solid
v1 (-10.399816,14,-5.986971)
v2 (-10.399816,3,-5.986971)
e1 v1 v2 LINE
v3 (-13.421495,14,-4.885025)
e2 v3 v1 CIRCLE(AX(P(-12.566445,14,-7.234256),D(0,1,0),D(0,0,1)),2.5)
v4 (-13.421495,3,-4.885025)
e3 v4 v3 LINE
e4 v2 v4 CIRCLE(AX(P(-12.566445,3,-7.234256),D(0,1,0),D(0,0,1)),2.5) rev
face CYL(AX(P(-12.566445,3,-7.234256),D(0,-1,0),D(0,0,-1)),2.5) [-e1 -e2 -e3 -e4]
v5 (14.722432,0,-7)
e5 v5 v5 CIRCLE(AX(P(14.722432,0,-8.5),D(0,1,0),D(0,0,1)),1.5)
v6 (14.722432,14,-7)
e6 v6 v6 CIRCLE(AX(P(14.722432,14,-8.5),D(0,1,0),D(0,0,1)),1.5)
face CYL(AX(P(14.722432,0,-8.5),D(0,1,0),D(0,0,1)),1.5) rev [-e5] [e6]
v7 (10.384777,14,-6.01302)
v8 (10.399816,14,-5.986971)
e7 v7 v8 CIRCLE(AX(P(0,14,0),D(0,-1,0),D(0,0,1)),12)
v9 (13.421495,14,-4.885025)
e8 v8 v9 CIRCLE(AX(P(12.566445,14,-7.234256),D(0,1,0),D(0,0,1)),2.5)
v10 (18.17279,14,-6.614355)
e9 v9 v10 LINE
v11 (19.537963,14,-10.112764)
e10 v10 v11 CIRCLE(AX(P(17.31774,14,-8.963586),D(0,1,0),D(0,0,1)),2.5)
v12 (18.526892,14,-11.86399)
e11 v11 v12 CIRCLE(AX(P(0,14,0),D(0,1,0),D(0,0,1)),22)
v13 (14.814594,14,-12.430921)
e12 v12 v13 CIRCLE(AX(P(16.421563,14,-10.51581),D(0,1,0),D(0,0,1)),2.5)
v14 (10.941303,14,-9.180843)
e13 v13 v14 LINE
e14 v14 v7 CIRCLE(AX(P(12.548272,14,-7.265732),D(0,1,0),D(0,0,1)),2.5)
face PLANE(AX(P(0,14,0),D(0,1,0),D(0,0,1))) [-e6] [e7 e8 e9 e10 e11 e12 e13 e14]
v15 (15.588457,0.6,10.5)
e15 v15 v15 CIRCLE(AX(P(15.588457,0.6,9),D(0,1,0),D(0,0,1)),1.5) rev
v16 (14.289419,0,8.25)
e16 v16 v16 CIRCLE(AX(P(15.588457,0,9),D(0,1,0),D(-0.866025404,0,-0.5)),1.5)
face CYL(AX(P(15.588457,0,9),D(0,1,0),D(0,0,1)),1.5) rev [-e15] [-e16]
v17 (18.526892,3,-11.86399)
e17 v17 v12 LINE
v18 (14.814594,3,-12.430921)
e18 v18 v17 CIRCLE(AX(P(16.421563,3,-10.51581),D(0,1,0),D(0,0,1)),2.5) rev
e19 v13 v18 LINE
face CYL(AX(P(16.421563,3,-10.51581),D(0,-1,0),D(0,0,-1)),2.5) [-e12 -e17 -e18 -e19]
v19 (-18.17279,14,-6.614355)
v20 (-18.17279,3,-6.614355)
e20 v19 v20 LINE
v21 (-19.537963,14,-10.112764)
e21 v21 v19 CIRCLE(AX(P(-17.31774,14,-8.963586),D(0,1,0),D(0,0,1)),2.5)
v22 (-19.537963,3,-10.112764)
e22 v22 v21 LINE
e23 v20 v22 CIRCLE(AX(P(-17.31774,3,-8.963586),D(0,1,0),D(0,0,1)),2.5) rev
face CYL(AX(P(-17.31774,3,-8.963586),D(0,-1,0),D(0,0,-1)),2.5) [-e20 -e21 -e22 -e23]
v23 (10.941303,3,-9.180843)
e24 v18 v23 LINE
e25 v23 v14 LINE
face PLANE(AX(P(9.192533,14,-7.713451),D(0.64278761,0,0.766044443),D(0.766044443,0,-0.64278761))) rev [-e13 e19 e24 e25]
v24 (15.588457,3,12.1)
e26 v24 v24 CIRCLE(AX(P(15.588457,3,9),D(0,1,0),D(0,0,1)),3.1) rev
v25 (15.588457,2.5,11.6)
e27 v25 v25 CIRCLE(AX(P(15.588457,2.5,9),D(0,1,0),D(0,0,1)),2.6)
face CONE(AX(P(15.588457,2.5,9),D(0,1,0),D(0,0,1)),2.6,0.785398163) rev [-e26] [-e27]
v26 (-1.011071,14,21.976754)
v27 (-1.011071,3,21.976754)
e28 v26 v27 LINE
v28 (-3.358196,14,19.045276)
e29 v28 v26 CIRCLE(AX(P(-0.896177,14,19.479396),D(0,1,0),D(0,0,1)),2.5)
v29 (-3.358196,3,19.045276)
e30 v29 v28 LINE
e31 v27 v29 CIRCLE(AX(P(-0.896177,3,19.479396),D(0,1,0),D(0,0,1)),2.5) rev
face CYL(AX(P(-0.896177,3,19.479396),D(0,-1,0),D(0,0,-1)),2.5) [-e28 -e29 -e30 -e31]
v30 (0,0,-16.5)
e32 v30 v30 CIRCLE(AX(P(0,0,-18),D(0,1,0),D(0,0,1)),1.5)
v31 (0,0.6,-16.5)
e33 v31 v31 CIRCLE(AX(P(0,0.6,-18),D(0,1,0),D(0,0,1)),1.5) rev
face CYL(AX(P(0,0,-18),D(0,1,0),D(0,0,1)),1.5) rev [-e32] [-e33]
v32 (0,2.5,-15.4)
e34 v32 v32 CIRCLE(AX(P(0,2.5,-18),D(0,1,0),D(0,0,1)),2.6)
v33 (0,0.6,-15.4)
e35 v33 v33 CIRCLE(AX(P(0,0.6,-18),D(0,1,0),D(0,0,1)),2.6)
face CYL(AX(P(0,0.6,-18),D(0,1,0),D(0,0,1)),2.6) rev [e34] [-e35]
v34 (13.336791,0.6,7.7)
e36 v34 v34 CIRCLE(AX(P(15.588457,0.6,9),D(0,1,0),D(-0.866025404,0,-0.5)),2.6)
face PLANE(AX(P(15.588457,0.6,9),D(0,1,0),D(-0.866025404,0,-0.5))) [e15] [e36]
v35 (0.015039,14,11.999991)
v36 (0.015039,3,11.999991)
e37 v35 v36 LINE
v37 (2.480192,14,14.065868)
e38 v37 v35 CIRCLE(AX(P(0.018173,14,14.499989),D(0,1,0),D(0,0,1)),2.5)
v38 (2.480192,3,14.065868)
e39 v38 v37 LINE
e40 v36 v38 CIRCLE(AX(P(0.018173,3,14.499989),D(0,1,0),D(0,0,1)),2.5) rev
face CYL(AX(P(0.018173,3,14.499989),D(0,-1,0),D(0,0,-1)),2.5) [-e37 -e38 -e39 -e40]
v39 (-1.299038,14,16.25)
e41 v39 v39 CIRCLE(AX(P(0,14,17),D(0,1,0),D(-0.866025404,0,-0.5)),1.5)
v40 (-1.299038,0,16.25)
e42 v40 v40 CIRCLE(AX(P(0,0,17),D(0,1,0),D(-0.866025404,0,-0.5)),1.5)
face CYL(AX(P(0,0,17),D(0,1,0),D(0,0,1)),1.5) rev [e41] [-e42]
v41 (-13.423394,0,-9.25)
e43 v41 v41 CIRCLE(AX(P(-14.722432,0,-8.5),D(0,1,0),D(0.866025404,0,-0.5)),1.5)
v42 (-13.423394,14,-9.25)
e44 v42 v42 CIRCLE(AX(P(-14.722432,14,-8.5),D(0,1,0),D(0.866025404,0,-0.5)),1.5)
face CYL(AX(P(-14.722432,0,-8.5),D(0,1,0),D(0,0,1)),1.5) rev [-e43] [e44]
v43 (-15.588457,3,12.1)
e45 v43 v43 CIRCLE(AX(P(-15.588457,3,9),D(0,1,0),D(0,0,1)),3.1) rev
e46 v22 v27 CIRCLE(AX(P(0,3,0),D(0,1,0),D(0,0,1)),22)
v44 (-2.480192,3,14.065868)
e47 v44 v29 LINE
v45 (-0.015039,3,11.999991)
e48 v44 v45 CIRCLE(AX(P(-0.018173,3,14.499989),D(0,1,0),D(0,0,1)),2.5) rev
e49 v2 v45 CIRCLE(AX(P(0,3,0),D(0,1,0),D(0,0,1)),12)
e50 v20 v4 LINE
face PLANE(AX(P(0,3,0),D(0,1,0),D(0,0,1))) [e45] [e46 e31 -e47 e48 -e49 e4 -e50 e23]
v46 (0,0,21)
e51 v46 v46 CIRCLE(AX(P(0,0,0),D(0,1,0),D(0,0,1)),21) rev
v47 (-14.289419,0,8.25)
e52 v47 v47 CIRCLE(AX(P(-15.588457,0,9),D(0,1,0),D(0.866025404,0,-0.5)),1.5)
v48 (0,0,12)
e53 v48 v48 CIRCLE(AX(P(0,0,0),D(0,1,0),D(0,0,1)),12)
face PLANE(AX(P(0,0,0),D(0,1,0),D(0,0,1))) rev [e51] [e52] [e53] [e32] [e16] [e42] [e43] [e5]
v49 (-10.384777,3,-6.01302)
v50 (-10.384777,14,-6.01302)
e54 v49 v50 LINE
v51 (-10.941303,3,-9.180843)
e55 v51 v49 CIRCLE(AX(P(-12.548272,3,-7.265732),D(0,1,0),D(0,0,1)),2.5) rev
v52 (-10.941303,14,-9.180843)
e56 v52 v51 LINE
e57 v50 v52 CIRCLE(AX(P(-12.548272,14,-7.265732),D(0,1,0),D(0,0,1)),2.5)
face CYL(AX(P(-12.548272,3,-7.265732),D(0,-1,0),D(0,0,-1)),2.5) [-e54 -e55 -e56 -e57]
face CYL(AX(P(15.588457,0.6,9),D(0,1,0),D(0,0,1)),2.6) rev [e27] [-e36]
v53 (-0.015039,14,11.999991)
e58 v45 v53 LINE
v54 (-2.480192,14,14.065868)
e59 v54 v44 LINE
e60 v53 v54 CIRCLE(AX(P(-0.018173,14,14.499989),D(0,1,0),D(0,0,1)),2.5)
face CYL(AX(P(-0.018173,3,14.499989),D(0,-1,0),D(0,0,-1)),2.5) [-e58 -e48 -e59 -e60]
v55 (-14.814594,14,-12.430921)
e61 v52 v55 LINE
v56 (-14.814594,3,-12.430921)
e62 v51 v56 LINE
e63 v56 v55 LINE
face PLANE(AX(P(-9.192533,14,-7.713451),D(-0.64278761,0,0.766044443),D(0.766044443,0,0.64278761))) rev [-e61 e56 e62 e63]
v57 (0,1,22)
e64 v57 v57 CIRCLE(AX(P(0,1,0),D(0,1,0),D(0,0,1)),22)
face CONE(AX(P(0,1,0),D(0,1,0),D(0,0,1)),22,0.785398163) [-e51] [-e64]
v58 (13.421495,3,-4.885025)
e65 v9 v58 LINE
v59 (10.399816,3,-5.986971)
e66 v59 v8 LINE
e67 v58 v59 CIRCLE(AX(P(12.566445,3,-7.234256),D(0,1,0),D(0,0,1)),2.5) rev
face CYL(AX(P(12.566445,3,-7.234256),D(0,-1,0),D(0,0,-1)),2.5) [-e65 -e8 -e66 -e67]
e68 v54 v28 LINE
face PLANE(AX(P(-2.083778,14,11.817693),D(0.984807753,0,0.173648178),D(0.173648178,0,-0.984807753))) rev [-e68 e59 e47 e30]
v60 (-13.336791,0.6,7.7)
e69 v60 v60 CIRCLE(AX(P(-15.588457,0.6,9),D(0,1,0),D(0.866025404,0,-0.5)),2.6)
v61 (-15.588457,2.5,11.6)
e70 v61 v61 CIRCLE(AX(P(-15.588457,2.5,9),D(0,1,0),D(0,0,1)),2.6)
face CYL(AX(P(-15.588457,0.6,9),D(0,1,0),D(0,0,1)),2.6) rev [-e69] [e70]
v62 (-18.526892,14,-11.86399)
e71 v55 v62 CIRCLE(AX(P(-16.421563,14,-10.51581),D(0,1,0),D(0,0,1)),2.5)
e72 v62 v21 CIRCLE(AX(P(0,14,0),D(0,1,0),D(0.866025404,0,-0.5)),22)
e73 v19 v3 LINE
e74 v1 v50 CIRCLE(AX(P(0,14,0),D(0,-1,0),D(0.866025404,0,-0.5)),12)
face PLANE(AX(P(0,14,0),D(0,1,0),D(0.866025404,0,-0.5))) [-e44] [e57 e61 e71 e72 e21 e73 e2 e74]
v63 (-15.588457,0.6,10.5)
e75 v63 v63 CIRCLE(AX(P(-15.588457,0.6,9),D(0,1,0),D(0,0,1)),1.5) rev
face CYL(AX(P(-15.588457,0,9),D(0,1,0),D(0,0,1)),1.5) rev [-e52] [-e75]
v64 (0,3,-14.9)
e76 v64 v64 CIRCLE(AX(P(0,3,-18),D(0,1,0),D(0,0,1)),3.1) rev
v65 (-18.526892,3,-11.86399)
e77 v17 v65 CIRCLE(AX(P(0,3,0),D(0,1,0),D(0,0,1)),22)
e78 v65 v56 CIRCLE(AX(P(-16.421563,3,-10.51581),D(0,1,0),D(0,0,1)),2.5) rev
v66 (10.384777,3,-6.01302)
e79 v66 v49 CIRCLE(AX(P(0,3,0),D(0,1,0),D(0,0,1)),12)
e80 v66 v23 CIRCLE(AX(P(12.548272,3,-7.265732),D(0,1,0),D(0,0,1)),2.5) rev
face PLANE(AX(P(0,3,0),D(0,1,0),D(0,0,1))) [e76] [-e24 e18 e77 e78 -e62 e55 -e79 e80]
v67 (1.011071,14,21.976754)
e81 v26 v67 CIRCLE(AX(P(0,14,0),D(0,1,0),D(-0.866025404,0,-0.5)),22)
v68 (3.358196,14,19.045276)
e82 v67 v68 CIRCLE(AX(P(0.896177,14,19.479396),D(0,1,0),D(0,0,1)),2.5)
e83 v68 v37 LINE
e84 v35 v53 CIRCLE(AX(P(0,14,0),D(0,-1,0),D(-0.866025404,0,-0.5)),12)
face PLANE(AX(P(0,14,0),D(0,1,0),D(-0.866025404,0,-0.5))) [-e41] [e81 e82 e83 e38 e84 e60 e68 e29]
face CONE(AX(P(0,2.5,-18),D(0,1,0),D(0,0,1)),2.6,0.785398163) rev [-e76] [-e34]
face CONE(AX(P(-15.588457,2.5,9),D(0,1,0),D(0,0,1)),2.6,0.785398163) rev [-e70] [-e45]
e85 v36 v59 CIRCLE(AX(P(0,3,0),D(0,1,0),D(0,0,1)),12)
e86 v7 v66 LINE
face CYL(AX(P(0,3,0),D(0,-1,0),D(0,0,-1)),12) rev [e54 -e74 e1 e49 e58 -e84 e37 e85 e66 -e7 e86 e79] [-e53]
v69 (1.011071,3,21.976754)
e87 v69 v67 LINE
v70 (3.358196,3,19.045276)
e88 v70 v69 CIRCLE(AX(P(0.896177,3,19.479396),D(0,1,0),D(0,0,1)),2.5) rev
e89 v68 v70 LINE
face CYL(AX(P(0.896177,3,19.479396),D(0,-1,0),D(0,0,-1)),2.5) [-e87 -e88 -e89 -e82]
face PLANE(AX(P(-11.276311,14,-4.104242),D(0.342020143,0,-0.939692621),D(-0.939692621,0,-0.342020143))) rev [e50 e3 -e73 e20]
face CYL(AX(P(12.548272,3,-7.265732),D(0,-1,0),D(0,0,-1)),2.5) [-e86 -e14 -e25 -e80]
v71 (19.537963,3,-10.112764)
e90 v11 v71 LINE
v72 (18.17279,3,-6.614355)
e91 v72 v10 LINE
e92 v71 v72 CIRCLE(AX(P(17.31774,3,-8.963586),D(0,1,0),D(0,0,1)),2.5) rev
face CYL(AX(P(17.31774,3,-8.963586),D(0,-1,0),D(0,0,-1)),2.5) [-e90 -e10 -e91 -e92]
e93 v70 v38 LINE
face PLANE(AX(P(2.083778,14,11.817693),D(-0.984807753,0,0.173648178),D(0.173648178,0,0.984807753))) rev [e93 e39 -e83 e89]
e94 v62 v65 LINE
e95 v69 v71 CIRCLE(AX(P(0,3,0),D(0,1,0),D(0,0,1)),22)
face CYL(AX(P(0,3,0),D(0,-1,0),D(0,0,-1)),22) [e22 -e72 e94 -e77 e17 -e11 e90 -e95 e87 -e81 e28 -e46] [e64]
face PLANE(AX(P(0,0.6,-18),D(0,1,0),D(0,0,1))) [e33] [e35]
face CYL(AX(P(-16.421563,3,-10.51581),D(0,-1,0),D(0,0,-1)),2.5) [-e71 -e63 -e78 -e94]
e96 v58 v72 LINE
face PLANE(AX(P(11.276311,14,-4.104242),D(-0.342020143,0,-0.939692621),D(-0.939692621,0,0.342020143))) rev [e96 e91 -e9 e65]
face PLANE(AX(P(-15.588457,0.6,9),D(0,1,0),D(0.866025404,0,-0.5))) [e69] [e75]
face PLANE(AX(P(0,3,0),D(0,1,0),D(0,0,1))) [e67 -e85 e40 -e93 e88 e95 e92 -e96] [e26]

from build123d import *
from build123d.topology import SkipClean

# Parameters (mm, degrees)
SKETCH1_R           = 22
SKETCH1_R_2         = 12
BOSS_EXTRUDE1_DEPTH = 3
SKETCH3_R           = 1.5
CUT_EXTRUDE2_DEPTH  = 32.256999216
SKETCH5_R           = 2.6
CUT_EXTRUDE3_DEPTH  = 2.4
CIRPATTERN1_COUNT   = 3
SKETCH4_R           = 1.5
BOSS_EXTRUDE2_DEPTH = 11
CIRPATTERN2_COUNT   = 3
FILLET1_R           = 2.5
CHAMFER1_SIZE       = 0.5
CHAMFER2_SIZE       = 1


with BuildPart() as part:
    # Sketch1 → Boss-Extrude1 (new body)
    with BuildSketch(Plane(origin=(0, 0, 0), x_dir=(1, 0, 0), z_dir=(0, 1, 0))):
        with Locations(Location((0, 0, 0), (0, 0, 270))):
            Circle(SKETCH1_R)
        with Locations(Location((0, 0, 0), (0, 0, 270))):
            Circle(SKETCH1_R_2, mode=Mode.SUBTRACT)
    extrude(amount=BOSS_EXTRUDE1_DEPTH)

    # Sketch3 → Cut-Extrude2 (cut, through all)
    with BuildSketch(Plane(origin=(0, 3, 0), x_dir=(1, 0, 0), z_dir=(0, 1, 0))):
        with Locations(Location((14.722431864, 8.5, 0), (0, 0, 270))):
            Circle(SKETCH3_R)
        with Locations(Location((0, 18, 0), (0, 0, 270))):
            Circle(SKETCH3_R)
    cut_extrude2 = extrude(amount=-CUT_EXTRUDE2_DEPTH, mode=Mode.SUBTRACT)

    # Sketch5 → Cut-Extrude3 (cut)
    with BuildSketch(Plane(origin=(0, 3, 0), x_dir=(1, 0, 0), z_dir=(0, 1, 0))):
        with Locations(Location((0, 18, 0), (0, 0, 270))):
            Circle(SKETCH5_R)
    cut_extrude3 = extrude(amount=-CUT_EXTRUDE3_DEPTH, mode=Mode.SUBTRACT)

    # CirPattern1: Cut-Extrude2, Cut-Extrude3 ×3 about axis
    cirpattern1_axis = Axis((0, 0, 0), (0, 1, 0))
    add([cut_extrude2.rotate(cirpattern1_axis, i * 360 / CIRPATTERN1_COUNT) for i in range(1, CIRPATTERN1_COUNT)], mode=Mode.SUBTRACT)
    add([cut_extrude3.rotate(cirpattern1_axis, i * 360 / CIRPATTERN1_COUNT) for i in range(1, CIRPATTERN1_COUNT)], mode=Mode.SUBTRACT)

    # Sketch4 → Boss-Extrude2 (add)
    with SkipClean():  # the faces are left unmerged after this step: merging them gives an invalid solid
        with BuildSketch(Plane(origin=(0, 3, 0), x_dir=(1, 0, 0), z_dir=(0, 1, 0))):
            with BuildLine():
                Line((9.192533317, 7.713451316), (16.852977749, 14.141327413))
                ThreePointArc((16.852977749, 14.141327413), (19.052558883, 11), (20.673237657, 7.524443153))
                Line((20.673237657, 7.524443153), (11.276311449, 4.10424172))
                ThreePointArc((11.276311449, 4.10424172), (10.392304845, 6), (9.192533317, 7.713451316))
            make_face()
            with Locations(Location((14.722431864, 8.5, 0), (0, 0, 270))):
                Circle(SKETCH4_R, mode=Mode.SUBTRACT)
        boss_extrude2 = extrude(amount=BOSS_EXTRUDE2_DEPTH)

    # CirPattern2: Boss-Extrude2 ×3 about axis
    with SkipClean():  # the faces are left unmerged after this step: merging them gives an invalid solid
        cirpattern2_axis = Axis((0, 0, 0), (0, 1, 0))
        for i in range(1, CIRPATTERN2_COUNT):
            add(boss_extrude2.rotate(cirpattern2_axis, i * 360 / CIRPATTERN2_COUNT))

    # Fillet1
    # the kernel refuses this fillet: 2.5 mm, written as the material it takes off along each edge
    with BuildSketch(Plane(origin=(9.192533317, 3, -7.713451316), x_dir=(0.7660444431189769, 0, -0.6427876096865408), z_dir=(0, 1, 0)), Plane(origin=(-11.276311449, 3, -4.10424172), x_dir=(-0.9396926207859091, 0, -0.34202014332566705), z_dir=(0, 1, 0)), Plane(origin=(2.083778132, 3, 11.817693036), x_dir=(0.1736481776669318, 0, 0.9848077530122079), z_dir=(0, 1, 0))) as fillet1_piece_1:
        with BuildLine():
            CenterArc((2.282856857, -2.5), FILLET1_R, 90, 80.071808158)
            ThreePointArc((-0.17970467, -2.068965517), (-0.045010582, -1.03837759), (0, 0))
            Line((0, 0), (2.282856857, 0))
        make_face()
    extrude(amount=16.707142143, mode=Mode.SUBTRACT)
    with BuildSketch(Plane(origin=(11.276311449, 3, -4.10424172), x_dir=(0.9396926207859079, 0, -0.34202014332567005), z_dir=(0, 1, 0)), Plane(origin=(-9.192533317, 3, -7.713451316), x_dir=(-0.7660444431189779, 0, -0.6427876096865395), z_dir=(0, 1, 0)), Plane(origin=(-2.083778132, 3, 11.817693036), x_dir=(-0.17364817766692894, 0, 0.9848077530122082), z_dir=(0, 1, 0))) as fillet1_piece_2:
        with BuildLine():
            CenterArc((2.282856857, 2.5), FILLET1_R, 189.928191842, 80.071808158)
            ThreePointArc((-0.17970467, 2.068965517), (-0.045010582, 1.03837759), (0, 0))
            Line((0, 0), (2.282856857, 0))
        make_face()
    extrude(amount=16.707142143, mode=Mode.SUBTRACT)
    with BuildSketch(Plane(origin=(20.673237657, 3, -7.524443153), x_dir=(-0.40167516398546327, 0, -0.9157822135405619), z_dir=(0, 1, 0)), Plane(origin=(-16.852977749, 3, -14.141327413), x_dir=(-0.5922530792673408, 0, 0.8057520028509721), z_dir=(0, 1, 0)), Plane(origin=(-3.820259909, 3, 21.665770566), x_dir=(0.9939282432528036, 0, 0.11003021068958989), z_dir=(0, 1, 0))) as fillet1_piece_3:
        with BuildLine():
            CenterArc((2.66576178, 2.494836964), FILLET1_R, 176.317057086, 97.365885829)
            Line((0.170924817, 2.655425023), (0, 0))
            ThreePointArc((0, 0), (1.41317492, -0.04543472), (2.826349839, 0))
        make_face()
    extrude(amount=18.065874598, mode=Mode.SUBTRACT)
    with BuildSketch(Plane(origin=(16.852977749, 3, -14.141327413), x_dir=(0.5922530792673405, 0, 0.8057520028509723), z_dir=(0, 1, 0)), Plane(origin=(-20.673237657, 3, -7.524443153), x_dir=(0.40167516398546094, 0, -0.9157822135405629), z_dir=(0, 1, 0)), Plane(origin=(3.820259909, 3, 21.665770566), x_dir=(-0.9939282432528035, 0, 0.11003021068959112), z_dir=(0, 1, 0))) as fillet1_piece_4:
        with BuildLine():
            CenterArc((2.66576178, -2.494836964), FILLET1_R, 86.317057086, 97.365885829)
            Line((0.170924817, -2.655425023), (0, 0))
            ThreePointArc((0, 0), (1.41317492, 0.04543472), (2.826349839, 0))
        make_face()
    extrude(amount=18.065874598, mode=Mode.SUBTRACT)

    # Chamfer1
    chamfer1_edges = [part.edges().sort_by_distance(p)[0] for p in [
        (0, 3, -20.6),
        (17.840123318, 3, 10.3),
        (-17.840123318, 3, 10.3),
    ]]
    chamfer(chamfer1_edges, length=CHAMFER1_SIZE)

    # Chamfer2
    chamfer2_edges = [part.edges().sort_by_distance(p)[0] for p in [
        (0, 0, -22),
    ]]
    chamfer(chamfer2_edges, length=CHAMFER2_SIZE)


solid = part.part
